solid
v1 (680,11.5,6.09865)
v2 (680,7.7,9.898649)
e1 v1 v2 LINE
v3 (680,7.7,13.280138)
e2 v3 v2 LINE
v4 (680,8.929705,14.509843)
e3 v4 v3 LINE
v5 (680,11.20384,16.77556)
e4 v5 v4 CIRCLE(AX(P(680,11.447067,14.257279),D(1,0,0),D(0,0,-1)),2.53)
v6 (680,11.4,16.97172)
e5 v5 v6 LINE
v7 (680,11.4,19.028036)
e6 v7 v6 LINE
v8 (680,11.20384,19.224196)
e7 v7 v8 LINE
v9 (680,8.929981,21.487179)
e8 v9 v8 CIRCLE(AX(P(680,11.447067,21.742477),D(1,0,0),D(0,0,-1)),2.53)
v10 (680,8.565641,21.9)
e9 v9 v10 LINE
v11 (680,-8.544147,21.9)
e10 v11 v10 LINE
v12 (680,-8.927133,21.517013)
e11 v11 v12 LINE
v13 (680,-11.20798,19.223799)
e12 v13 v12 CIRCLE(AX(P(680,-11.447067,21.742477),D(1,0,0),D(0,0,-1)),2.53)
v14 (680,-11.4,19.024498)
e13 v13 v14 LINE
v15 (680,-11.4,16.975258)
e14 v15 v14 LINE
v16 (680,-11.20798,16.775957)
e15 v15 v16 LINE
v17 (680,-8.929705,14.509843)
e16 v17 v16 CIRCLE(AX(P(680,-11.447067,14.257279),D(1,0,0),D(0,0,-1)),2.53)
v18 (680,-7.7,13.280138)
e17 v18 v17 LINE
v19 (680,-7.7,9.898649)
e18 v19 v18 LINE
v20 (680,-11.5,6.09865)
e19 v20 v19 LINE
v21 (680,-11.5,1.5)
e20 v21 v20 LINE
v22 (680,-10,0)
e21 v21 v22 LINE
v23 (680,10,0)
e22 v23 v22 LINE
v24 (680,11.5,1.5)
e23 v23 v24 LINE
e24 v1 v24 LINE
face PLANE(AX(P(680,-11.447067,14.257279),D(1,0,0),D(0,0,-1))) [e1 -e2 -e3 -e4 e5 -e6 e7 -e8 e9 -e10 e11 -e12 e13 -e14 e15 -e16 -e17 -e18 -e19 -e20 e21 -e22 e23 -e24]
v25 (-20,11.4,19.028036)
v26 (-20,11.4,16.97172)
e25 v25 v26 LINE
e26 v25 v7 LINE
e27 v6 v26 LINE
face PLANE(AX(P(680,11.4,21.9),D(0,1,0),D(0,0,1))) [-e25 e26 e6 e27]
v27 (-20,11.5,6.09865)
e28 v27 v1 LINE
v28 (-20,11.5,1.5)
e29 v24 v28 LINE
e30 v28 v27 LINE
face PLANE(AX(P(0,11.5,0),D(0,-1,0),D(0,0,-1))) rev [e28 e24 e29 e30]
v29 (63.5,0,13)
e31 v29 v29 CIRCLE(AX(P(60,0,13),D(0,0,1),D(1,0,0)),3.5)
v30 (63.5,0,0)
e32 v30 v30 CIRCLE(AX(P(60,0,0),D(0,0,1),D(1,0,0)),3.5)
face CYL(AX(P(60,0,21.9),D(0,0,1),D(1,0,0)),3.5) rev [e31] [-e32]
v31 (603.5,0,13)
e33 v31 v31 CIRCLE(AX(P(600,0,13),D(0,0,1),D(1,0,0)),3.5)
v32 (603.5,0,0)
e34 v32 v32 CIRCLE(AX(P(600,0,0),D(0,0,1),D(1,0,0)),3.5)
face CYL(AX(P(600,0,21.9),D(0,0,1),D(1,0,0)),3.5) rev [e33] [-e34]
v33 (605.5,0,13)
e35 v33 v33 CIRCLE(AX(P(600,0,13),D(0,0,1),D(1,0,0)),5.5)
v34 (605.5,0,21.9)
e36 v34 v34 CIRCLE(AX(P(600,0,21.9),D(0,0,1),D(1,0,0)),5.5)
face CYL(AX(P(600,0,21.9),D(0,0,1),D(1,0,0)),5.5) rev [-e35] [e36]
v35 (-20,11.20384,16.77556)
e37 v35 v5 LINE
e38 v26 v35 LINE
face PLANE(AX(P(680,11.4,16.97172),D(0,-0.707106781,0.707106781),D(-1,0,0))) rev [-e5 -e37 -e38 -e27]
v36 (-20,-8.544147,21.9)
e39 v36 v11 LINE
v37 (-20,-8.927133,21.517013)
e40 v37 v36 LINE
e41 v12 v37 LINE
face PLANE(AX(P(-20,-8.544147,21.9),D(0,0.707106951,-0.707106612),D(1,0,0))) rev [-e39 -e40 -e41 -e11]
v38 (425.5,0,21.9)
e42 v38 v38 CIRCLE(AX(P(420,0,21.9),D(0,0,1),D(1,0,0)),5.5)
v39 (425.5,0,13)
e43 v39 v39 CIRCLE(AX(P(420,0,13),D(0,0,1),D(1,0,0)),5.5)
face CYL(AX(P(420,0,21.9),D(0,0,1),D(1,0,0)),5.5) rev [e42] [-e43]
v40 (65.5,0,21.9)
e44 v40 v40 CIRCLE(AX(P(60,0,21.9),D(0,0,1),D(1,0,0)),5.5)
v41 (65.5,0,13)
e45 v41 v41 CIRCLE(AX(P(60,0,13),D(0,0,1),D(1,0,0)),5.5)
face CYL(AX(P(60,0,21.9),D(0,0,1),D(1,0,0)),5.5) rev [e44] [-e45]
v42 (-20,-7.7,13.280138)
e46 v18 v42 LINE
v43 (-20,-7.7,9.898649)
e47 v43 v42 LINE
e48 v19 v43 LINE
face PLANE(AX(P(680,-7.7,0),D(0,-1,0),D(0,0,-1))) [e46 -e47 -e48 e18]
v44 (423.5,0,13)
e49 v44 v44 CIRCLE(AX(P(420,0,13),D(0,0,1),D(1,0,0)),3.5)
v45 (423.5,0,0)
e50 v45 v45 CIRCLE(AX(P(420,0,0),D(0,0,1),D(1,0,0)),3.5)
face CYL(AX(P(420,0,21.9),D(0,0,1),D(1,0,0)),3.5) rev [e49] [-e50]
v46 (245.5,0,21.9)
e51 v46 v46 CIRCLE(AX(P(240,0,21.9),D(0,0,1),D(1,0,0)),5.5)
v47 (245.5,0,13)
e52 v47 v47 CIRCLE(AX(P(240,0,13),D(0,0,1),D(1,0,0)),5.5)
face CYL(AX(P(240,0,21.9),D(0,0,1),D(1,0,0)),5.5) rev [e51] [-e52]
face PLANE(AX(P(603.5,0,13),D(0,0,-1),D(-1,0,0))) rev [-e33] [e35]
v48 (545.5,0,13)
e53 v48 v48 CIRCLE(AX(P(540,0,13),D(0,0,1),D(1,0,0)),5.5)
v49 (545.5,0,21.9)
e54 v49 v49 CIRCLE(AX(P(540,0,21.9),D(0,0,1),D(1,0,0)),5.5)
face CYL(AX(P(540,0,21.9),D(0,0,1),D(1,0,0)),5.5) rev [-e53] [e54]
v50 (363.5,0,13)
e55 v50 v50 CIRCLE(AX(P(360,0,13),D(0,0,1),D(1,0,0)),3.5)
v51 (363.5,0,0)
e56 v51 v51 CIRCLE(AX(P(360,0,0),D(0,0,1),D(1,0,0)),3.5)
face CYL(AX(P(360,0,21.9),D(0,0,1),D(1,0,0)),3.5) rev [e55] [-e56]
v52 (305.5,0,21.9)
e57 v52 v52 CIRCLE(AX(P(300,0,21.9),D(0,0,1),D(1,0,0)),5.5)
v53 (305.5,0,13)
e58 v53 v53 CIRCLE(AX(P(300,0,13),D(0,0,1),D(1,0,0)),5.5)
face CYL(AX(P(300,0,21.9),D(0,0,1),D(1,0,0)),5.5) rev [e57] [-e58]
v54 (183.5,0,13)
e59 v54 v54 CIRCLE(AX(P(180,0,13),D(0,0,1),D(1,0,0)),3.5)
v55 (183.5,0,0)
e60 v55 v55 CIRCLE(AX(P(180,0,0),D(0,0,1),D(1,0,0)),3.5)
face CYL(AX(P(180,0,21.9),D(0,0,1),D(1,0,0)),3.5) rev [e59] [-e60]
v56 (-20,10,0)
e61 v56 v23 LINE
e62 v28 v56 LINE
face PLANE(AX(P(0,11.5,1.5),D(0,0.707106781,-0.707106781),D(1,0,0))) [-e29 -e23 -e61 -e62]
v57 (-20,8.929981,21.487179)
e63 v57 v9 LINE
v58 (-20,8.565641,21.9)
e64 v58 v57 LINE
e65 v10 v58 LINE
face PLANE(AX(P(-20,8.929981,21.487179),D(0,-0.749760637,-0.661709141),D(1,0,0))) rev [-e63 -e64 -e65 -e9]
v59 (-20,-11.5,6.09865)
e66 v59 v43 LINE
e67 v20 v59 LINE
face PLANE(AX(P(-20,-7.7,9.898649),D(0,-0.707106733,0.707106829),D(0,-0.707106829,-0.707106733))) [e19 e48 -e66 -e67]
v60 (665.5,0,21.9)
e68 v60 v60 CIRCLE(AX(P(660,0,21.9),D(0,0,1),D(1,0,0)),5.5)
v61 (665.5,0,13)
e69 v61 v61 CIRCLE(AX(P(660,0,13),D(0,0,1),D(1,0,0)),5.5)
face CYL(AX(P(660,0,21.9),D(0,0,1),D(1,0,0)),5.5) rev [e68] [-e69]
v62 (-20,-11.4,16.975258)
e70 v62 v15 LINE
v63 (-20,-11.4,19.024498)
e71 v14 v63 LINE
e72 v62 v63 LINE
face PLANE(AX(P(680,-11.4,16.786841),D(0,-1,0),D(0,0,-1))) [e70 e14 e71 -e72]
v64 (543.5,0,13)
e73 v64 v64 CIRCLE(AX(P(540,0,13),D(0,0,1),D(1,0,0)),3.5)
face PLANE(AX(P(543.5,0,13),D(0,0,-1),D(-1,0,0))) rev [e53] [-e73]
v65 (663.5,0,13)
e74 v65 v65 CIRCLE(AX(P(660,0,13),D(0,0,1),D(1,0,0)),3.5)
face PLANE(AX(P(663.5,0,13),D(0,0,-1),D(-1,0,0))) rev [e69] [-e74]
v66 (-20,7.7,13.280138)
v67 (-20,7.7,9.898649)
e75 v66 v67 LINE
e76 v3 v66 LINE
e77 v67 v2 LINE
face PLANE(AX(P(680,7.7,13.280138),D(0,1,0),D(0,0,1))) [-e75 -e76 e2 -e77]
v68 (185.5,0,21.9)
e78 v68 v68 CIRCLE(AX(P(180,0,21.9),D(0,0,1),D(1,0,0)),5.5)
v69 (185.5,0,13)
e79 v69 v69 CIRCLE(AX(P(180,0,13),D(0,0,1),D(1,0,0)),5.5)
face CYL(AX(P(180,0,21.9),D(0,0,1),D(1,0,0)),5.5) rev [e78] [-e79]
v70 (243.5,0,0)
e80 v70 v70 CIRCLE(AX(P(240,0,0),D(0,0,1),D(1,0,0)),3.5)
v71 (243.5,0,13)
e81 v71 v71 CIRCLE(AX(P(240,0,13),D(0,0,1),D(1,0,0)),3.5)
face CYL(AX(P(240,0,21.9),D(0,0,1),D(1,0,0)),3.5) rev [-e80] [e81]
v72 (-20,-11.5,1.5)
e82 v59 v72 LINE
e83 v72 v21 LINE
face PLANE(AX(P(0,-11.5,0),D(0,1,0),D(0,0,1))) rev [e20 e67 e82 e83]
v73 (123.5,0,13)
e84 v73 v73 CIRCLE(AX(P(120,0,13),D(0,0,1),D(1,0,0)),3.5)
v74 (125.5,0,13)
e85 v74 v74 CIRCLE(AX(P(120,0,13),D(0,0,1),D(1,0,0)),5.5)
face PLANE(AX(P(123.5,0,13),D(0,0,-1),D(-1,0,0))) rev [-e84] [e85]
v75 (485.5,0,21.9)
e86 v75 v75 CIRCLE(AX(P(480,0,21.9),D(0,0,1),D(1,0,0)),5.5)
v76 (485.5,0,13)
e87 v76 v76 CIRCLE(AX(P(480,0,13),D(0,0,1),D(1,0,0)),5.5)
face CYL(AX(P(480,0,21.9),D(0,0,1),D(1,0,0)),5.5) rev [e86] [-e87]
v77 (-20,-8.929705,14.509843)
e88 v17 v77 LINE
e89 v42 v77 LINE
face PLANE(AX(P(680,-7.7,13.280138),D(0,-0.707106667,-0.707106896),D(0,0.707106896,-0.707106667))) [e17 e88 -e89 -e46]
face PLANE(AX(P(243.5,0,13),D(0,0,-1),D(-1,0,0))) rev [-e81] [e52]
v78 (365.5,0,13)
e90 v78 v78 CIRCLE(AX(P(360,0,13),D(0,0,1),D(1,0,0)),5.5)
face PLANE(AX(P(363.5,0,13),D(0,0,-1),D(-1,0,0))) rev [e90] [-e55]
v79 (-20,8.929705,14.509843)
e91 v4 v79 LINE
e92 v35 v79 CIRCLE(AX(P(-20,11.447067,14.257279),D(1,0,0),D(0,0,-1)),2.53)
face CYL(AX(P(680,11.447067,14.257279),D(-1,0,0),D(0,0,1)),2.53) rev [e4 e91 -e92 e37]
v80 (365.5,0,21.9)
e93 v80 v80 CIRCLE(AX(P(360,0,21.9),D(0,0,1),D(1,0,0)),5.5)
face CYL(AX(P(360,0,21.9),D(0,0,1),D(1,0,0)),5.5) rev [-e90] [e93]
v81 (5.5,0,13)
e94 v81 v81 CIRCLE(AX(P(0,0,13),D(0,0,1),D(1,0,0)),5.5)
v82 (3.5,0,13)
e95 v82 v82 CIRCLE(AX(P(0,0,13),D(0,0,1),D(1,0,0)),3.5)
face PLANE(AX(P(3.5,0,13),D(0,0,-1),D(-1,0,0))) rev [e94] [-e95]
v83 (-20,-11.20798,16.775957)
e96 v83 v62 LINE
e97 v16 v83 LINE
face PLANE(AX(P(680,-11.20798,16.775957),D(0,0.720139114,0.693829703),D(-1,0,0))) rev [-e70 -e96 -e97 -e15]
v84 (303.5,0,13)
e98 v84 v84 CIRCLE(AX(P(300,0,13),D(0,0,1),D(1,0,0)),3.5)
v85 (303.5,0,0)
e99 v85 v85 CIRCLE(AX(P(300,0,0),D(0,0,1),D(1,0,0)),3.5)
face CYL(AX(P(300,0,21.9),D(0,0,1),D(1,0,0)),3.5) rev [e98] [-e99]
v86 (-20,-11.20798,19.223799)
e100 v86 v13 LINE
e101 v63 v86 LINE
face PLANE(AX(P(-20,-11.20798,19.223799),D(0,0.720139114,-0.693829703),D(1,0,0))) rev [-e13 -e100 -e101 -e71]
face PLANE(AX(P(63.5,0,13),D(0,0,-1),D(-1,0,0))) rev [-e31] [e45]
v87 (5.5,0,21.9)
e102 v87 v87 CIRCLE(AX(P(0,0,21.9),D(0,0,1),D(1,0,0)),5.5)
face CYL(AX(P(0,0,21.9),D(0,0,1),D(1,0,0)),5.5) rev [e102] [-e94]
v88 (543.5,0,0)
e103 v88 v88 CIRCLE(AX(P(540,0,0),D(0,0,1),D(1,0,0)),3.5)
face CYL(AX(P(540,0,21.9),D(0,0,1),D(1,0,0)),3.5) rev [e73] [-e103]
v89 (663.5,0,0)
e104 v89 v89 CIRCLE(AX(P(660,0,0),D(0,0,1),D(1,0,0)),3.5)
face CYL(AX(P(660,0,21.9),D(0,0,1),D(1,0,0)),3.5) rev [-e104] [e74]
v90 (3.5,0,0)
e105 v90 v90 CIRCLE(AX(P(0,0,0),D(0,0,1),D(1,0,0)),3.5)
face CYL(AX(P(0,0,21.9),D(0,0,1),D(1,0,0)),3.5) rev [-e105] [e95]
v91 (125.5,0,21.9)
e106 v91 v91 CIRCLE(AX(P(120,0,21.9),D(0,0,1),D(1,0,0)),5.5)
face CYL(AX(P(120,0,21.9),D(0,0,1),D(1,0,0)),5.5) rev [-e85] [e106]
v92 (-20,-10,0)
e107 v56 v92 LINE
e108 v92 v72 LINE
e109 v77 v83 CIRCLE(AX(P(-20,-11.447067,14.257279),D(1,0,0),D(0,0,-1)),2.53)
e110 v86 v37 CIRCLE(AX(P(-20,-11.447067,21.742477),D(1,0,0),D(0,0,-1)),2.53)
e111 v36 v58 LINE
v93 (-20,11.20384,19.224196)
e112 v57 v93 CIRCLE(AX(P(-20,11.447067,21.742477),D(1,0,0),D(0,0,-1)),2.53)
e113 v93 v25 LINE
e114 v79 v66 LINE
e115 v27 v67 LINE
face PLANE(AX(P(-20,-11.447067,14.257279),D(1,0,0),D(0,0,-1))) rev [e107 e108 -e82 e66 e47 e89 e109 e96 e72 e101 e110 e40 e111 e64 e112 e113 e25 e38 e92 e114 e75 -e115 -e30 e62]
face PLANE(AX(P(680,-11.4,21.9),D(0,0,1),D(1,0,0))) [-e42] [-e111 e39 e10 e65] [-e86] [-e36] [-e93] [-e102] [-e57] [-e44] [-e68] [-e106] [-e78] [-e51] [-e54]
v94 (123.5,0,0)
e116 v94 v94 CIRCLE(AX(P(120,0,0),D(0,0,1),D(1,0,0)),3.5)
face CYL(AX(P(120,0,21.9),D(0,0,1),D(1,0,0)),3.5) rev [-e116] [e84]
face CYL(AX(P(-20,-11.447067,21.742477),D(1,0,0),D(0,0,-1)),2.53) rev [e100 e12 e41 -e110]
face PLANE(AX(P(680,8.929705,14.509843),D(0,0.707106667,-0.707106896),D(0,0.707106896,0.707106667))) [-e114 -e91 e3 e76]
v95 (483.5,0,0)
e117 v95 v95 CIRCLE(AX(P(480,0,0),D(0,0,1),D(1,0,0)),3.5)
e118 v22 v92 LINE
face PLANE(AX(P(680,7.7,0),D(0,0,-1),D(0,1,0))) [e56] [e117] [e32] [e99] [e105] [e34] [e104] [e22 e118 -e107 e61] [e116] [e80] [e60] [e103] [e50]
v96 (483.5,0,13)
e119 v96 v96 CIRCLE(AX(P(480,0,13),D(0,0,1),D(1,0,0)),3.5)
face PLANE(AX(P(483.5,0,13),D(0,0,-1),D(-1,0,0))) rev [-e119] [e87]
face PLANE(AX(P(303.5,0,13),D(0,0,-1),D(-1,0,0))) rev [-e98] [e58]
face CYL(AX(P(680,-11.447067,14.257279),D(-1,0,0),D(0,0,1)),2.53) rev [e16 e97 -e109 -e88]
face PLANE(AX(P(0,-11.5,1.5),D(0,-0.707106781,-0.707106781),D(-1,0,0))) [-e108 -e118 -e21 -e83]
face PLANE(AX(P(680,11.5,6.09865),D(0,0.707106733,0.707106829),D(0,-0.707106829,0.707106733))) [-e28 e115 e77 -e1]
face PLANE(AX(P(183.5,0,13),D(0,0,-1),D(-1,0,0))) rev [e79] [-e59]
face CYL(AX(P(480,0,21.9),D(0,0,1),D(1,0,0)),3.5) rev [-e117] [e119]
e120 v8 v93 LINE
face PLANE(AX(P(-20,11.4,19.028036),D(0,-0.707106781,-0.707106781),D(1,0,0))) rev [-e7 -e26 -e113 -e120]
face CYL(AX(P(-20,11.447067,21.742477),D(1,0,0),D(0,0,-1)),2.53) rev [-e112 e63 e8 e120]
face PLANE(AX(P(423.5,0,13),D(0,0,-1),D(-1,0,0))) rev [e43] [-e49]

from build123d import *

# Parameters (mm, degrees)
BOSS_EXTRUDE1_DEPTH                     = 700
SKETCH2_W                               = 700
SKETCH2_H                               = 9.898648987
BOSS_EXTRUDE2_DEPTH                     = 3.8
SKETCH3_W                               = 700
SKETCH3_H                               = 6.0986495
BOSS_EXTRUDE3_DEPTH                     = 3.8
CUT_EXTRUDE1_DEPTH                      = 701.436906509
CUT_EXTRUDE2_DEPTH                      = 701.436906509
DRAFT1_ANGLE                            = 44.999996129
DRAFT2_ANGLE                            = 44.999996129
CBORE_FOR_M6_HEX_HEAD_BOLT1_D           = 7
CBORE_FOR_M6_HEX_HEAD_BOLT1_CBORE_D     = 11
CBORE_FOR_M6_HEX_HEAD_BOLT1_CBORE_DEPTH = 8.9
CHAMFER1_SIZE                           = 0.184878832
CHAMFER1_SIZE_2                         = 0.188416661
CHAMFER2_SIZE                           = 0.377828878
CHAMFER2_SIZE_2                         = 0.356334292
CHAMFER3_SIZE                           = 1.5


with BuildPart() as part:
    # Sketch1 → Boss-Extrude1 (new body)
    with BuildSketch(Plane(origin=(-20, 0, 0), x_dir=(0, -1, 0), z_dir=(-1, 0, 0))):
        with BuildLine():
            Line((-7.7, 0), (7.7, 0))
            Line((7.7, 0), (7.7, 13.280138132))
            Line((7.7, 13.280138132), (8.929704991, 14.509842724))
            ThreePointArc((8.929704991, 14.509842724), (9.732349977, 16.117560007), (11.4, 16.786841141))
            Line((11.4, 16.786841141), (11.4, 21.9))
            Line((11.4, 21.9), (-11.4, 21.9))
            Line((-11.4, 21.9), (-11.4, 16.786841141))
            ThreePointArc((-11.4, 16.786841141), (-9.732349977, 16.117560007), (-8.929704991, 14.509842724))
            Line((-8.929704991, 14.509842724), (-7.7, 13.280138132))
            Line((-7.7, 13.280138132), (-7.7, 0))
        make_face()
    extrude(amount=-BOSS_EXTRUDE1_DEPTH)

    # Sketch2 → Boss-Extrude2 (add)
    with BuildSketch(Plane.XZ.offset(7.7)):
        with Locations((330, 4.949324494)):
            Rectangle(SKETCH2_W, SKETCH2_H)
    extrude(amount=BOSS_EXTRUDE2_DEPTH)

    # Sketch3 → Boss-Extrude3 (add)
    with BuildSketch(Plane(origin=(0, 7.7, 0), x_dir=(-1, 0, 0), z_dir=(0, 1, 0))):
        with Locations((-330, 3.04932475)):
            Rectangle(SKETCH3_W, SKETCH3_H)
    extrude(amount=BOSS_EXTRUDE3_DEPTH)

    # Sketch4 → Cut-Extrude1 (cut, through all)
    with BuildSketch(Plane(origin=(680, 0, 0), x_dir=(0, 0, -1), z_dir=(1, 0, 0))):
        with BuildLine():
            Line((-21.9, -11.4), (-19.212914859, -11.4))
            ThreePointArc((-19.212914859, -11.4), (-20.027311235, -9.587199721), (-21.9, -8.921975628))
            Line((-21.9, -8.921975628), (-21.9, -11.4))
        make_face()
    extrude(amount=-CUT_EXTRUDE1_DEPTH, mode=Mode.SUBTRACT)

    # Sketch5 → Cut-Extrude2 (cut, through all)
    with BuildSketch(Plane(origin=(680, 0, 0), x_dir=(0, 0, -1), z_dir=(1, 0, 0))):
        with BuildLine():
            Line((-21.9, 11.4), (-21.9, 8.921975628))
            ThreePointArc((-21.9, 8.921975628), (-20.027311235, 9.587199721), (-19.212914859, 11.4))
            Line((-19.212914859, 11.4), (-21.9, 11.4))
        make_face()
    extrude(amount=-CUT_EXTRUDE2_DEPTH, mode=Mode.SUBTRACT)

    # Draft1
    draft1_faces = [part.faces().sort_by_distance(p)[0] for p in [
        (330, 9.6, 6.0986495),
    ]]
    draft(draft1_faces, Plane.ZX.offset(11.5), DRAFT1_ANGLE)

    # Draft2
    draft2_faces = [part.faces().sort_by_distance(p)[0] for p in [
        (330, -9.6, 9.898648987),
    ]]
    draft(draft2_faces, Plane(origin=(680, -7.7, 0), x_dir=(0, 0, -1), z_dir=(0, -1, 0)), DRAFT2_ANGLE)

    # CBORE for M6 Hex Head Bolt1 (through all)
    with Locations(Plane.XY.offset(21.9)):
        with Locations((60, 0), (120, 0), (180, 0), (240, 0), (300, 0), (360, 0), (420, 0), (480, 0), (540, 0), (600, 0), (660, 0), (0, 0)):
            CounterBoreHole(CBORE_FOR_M6_HEX_HEAD_BOLT1_D / 2, CBORE_FOR_M6_HEX_HEAD_BOLT1_CBORE_D / 2, CBORE_FOR_M6_HEX_HEAD_BOLT1_CBORE_DEPTH)

    # Chamfer1
    # the kernel refuses this chamfer: 0.188416661, 0.184878832 mm, written as the material it takes off along each edge
    with BuildSketch(Plane(origin=(-20.505430952, 11.4, 16.786841141), x_dir=(0, -0.9983504789140061, -0.057413598146908586), z_dir=(1, 0, 0))) as chamfer1_piece_1:
        with BuildLine():
            Line((0.196483777, 0), (-CHAMFER1_SIZE * 0.0574135982779, -CHAMFER1_SIZE * 0.998350481192))
            Line((-CHAMFER1_SIZE * 0.0574135982779, -CHAMFER1_SIZE * 0.998350481192), (0, 0))
            ThreePointArc((0, 0), (0.101060009, -0.001906555), (0.196483777, 0))
        make_face()
    extrude(amount=701.010861905, mode=Mode.SUBTRACT)
    with BuildSketch(Plane(origin=(680.505430952, 11.4, 19.212914859), x_dir=(0, 0, -1), z_dir=(-1, 0, 0))) as chamfer1_piece_2:
        with BuildLine():
            Line((CHAMFER1_SIZE * 1.00000000228, 0), (-0.011280841, 0.196159673))
            ThreePointArc((-0.011280841, 0.196159673), (-0.003898809, 0.10100277), (0, 0))
            Line((0, 0), (CHAMFER1_SIZE * 1.00000000228, 0))
        make_face()
    extrude(amount=701.010861905, mode=Mode.SUBTRACT)
    with BuildSketch(Plane(origin=(-20.49480589, -11.4, 16.786841141), x_dir=(0, 0, 1), z_dir=(1, 0, 0))) as chamfer1_piece_3:
        with BuildLine():
            Line((CHAMFER1_SIZE_2 * 1.0000000015, 0), (-0.010884434, -0.192019871))
            ThreePointArc((-0.010884434, -0.192019871), (-0.003775118, -0.098877649), (0, 0))
            Line((0, 0), (CHAMFER1_SIZE_2 * 1.0000000015, 0))
        make_face()
    extrude(amount=700.98961178, mode=Mode.SUBTRACT)
    with BuildSketch(Plane(origin=(680.49480589, -11.4, 19.212914859), x_dir=(0, 0.9983973290920217, 0.05659304959018505), z_dir=(-1, 0, 0))) as chamfer1_piece_4:
        with BuildLine():
            Line((0.19232811, 0), (-CHAMFER1_SIZE_2 * 0.0565930496749, CHAMFER1_SIZE_2 * 0.998397330587))
            Line((-CHAMFER1_SIZE_2 * 0.0565930496749, CHAMFER1_SIZE_2 * 0.998397330587), (0, 0))
            ThreePointArc((0, 0), (0.098932826, 0.00182672), (0.19232811, 0))
        make_face()
    extrude(amount=700.98961178, mode=Mode.SUBTRACT)

    # Chamfer2
    # the kernel refuses this chamfer: 0.377828878, 0.356334292 mm, written as the material it takes off along each edge
    with BuildSketch(Plane(origin=(680.984980067, -8.921975628, 21.9), x_dir=(0, 1, 0), z_dir=(-1, 0, 0))) as chamfer2_piece_1:
        with BuildLine():
            Line((CHAMFER2_SIZE, 0), (-0.005157634, 0.382986696))
            ThreePointArc((-0.005157634, 0.382986696), (0.004600101, 0.197032231), (0, 0))
            Line((0, 0), (CHAMFER2_SIZE, 0))
        make_face()
    extrude(amount=701.969960134, mode=Mode.SUBTRACT)
    with BuildSketch(Plane(origin=(681.061335524, 8.921975628, 21.9), x_dir=(0, 0.01938777487044788, -0.9998120394281981), z_dir=(-1, 0, 0))) as chamfer2_piece_2:
        with BuildLine():
            Line((0.412898561, 0), (-CHAMFER2_SIZE_2 * 0.0193877748633, CHAMFER2_SIZE_2 * 0.999812039061))
            Line((-CHAMFER2_SIZE_2 * 0.0193877748633, CHAMFER2_SIZE_2 * 0.999812039061), (0, 0))
            ThreePointArc((0, 0), (0.212241278, 0.008430622), (0.412898561, 0))
        make_face()
    extrude(amount=702.122671049, mode=Mode.SUBTRACT)

    # Chamfer3
    chamfer3_edges = [part.edges().sort_by_distance(p)[0] for p in [
        (330, -11.5, 0),
        (330, 11.5, 0),
    ]]
    chamfer(chamfer3_edges, length=CHAMFER3_SIZE)


solid = part.part
